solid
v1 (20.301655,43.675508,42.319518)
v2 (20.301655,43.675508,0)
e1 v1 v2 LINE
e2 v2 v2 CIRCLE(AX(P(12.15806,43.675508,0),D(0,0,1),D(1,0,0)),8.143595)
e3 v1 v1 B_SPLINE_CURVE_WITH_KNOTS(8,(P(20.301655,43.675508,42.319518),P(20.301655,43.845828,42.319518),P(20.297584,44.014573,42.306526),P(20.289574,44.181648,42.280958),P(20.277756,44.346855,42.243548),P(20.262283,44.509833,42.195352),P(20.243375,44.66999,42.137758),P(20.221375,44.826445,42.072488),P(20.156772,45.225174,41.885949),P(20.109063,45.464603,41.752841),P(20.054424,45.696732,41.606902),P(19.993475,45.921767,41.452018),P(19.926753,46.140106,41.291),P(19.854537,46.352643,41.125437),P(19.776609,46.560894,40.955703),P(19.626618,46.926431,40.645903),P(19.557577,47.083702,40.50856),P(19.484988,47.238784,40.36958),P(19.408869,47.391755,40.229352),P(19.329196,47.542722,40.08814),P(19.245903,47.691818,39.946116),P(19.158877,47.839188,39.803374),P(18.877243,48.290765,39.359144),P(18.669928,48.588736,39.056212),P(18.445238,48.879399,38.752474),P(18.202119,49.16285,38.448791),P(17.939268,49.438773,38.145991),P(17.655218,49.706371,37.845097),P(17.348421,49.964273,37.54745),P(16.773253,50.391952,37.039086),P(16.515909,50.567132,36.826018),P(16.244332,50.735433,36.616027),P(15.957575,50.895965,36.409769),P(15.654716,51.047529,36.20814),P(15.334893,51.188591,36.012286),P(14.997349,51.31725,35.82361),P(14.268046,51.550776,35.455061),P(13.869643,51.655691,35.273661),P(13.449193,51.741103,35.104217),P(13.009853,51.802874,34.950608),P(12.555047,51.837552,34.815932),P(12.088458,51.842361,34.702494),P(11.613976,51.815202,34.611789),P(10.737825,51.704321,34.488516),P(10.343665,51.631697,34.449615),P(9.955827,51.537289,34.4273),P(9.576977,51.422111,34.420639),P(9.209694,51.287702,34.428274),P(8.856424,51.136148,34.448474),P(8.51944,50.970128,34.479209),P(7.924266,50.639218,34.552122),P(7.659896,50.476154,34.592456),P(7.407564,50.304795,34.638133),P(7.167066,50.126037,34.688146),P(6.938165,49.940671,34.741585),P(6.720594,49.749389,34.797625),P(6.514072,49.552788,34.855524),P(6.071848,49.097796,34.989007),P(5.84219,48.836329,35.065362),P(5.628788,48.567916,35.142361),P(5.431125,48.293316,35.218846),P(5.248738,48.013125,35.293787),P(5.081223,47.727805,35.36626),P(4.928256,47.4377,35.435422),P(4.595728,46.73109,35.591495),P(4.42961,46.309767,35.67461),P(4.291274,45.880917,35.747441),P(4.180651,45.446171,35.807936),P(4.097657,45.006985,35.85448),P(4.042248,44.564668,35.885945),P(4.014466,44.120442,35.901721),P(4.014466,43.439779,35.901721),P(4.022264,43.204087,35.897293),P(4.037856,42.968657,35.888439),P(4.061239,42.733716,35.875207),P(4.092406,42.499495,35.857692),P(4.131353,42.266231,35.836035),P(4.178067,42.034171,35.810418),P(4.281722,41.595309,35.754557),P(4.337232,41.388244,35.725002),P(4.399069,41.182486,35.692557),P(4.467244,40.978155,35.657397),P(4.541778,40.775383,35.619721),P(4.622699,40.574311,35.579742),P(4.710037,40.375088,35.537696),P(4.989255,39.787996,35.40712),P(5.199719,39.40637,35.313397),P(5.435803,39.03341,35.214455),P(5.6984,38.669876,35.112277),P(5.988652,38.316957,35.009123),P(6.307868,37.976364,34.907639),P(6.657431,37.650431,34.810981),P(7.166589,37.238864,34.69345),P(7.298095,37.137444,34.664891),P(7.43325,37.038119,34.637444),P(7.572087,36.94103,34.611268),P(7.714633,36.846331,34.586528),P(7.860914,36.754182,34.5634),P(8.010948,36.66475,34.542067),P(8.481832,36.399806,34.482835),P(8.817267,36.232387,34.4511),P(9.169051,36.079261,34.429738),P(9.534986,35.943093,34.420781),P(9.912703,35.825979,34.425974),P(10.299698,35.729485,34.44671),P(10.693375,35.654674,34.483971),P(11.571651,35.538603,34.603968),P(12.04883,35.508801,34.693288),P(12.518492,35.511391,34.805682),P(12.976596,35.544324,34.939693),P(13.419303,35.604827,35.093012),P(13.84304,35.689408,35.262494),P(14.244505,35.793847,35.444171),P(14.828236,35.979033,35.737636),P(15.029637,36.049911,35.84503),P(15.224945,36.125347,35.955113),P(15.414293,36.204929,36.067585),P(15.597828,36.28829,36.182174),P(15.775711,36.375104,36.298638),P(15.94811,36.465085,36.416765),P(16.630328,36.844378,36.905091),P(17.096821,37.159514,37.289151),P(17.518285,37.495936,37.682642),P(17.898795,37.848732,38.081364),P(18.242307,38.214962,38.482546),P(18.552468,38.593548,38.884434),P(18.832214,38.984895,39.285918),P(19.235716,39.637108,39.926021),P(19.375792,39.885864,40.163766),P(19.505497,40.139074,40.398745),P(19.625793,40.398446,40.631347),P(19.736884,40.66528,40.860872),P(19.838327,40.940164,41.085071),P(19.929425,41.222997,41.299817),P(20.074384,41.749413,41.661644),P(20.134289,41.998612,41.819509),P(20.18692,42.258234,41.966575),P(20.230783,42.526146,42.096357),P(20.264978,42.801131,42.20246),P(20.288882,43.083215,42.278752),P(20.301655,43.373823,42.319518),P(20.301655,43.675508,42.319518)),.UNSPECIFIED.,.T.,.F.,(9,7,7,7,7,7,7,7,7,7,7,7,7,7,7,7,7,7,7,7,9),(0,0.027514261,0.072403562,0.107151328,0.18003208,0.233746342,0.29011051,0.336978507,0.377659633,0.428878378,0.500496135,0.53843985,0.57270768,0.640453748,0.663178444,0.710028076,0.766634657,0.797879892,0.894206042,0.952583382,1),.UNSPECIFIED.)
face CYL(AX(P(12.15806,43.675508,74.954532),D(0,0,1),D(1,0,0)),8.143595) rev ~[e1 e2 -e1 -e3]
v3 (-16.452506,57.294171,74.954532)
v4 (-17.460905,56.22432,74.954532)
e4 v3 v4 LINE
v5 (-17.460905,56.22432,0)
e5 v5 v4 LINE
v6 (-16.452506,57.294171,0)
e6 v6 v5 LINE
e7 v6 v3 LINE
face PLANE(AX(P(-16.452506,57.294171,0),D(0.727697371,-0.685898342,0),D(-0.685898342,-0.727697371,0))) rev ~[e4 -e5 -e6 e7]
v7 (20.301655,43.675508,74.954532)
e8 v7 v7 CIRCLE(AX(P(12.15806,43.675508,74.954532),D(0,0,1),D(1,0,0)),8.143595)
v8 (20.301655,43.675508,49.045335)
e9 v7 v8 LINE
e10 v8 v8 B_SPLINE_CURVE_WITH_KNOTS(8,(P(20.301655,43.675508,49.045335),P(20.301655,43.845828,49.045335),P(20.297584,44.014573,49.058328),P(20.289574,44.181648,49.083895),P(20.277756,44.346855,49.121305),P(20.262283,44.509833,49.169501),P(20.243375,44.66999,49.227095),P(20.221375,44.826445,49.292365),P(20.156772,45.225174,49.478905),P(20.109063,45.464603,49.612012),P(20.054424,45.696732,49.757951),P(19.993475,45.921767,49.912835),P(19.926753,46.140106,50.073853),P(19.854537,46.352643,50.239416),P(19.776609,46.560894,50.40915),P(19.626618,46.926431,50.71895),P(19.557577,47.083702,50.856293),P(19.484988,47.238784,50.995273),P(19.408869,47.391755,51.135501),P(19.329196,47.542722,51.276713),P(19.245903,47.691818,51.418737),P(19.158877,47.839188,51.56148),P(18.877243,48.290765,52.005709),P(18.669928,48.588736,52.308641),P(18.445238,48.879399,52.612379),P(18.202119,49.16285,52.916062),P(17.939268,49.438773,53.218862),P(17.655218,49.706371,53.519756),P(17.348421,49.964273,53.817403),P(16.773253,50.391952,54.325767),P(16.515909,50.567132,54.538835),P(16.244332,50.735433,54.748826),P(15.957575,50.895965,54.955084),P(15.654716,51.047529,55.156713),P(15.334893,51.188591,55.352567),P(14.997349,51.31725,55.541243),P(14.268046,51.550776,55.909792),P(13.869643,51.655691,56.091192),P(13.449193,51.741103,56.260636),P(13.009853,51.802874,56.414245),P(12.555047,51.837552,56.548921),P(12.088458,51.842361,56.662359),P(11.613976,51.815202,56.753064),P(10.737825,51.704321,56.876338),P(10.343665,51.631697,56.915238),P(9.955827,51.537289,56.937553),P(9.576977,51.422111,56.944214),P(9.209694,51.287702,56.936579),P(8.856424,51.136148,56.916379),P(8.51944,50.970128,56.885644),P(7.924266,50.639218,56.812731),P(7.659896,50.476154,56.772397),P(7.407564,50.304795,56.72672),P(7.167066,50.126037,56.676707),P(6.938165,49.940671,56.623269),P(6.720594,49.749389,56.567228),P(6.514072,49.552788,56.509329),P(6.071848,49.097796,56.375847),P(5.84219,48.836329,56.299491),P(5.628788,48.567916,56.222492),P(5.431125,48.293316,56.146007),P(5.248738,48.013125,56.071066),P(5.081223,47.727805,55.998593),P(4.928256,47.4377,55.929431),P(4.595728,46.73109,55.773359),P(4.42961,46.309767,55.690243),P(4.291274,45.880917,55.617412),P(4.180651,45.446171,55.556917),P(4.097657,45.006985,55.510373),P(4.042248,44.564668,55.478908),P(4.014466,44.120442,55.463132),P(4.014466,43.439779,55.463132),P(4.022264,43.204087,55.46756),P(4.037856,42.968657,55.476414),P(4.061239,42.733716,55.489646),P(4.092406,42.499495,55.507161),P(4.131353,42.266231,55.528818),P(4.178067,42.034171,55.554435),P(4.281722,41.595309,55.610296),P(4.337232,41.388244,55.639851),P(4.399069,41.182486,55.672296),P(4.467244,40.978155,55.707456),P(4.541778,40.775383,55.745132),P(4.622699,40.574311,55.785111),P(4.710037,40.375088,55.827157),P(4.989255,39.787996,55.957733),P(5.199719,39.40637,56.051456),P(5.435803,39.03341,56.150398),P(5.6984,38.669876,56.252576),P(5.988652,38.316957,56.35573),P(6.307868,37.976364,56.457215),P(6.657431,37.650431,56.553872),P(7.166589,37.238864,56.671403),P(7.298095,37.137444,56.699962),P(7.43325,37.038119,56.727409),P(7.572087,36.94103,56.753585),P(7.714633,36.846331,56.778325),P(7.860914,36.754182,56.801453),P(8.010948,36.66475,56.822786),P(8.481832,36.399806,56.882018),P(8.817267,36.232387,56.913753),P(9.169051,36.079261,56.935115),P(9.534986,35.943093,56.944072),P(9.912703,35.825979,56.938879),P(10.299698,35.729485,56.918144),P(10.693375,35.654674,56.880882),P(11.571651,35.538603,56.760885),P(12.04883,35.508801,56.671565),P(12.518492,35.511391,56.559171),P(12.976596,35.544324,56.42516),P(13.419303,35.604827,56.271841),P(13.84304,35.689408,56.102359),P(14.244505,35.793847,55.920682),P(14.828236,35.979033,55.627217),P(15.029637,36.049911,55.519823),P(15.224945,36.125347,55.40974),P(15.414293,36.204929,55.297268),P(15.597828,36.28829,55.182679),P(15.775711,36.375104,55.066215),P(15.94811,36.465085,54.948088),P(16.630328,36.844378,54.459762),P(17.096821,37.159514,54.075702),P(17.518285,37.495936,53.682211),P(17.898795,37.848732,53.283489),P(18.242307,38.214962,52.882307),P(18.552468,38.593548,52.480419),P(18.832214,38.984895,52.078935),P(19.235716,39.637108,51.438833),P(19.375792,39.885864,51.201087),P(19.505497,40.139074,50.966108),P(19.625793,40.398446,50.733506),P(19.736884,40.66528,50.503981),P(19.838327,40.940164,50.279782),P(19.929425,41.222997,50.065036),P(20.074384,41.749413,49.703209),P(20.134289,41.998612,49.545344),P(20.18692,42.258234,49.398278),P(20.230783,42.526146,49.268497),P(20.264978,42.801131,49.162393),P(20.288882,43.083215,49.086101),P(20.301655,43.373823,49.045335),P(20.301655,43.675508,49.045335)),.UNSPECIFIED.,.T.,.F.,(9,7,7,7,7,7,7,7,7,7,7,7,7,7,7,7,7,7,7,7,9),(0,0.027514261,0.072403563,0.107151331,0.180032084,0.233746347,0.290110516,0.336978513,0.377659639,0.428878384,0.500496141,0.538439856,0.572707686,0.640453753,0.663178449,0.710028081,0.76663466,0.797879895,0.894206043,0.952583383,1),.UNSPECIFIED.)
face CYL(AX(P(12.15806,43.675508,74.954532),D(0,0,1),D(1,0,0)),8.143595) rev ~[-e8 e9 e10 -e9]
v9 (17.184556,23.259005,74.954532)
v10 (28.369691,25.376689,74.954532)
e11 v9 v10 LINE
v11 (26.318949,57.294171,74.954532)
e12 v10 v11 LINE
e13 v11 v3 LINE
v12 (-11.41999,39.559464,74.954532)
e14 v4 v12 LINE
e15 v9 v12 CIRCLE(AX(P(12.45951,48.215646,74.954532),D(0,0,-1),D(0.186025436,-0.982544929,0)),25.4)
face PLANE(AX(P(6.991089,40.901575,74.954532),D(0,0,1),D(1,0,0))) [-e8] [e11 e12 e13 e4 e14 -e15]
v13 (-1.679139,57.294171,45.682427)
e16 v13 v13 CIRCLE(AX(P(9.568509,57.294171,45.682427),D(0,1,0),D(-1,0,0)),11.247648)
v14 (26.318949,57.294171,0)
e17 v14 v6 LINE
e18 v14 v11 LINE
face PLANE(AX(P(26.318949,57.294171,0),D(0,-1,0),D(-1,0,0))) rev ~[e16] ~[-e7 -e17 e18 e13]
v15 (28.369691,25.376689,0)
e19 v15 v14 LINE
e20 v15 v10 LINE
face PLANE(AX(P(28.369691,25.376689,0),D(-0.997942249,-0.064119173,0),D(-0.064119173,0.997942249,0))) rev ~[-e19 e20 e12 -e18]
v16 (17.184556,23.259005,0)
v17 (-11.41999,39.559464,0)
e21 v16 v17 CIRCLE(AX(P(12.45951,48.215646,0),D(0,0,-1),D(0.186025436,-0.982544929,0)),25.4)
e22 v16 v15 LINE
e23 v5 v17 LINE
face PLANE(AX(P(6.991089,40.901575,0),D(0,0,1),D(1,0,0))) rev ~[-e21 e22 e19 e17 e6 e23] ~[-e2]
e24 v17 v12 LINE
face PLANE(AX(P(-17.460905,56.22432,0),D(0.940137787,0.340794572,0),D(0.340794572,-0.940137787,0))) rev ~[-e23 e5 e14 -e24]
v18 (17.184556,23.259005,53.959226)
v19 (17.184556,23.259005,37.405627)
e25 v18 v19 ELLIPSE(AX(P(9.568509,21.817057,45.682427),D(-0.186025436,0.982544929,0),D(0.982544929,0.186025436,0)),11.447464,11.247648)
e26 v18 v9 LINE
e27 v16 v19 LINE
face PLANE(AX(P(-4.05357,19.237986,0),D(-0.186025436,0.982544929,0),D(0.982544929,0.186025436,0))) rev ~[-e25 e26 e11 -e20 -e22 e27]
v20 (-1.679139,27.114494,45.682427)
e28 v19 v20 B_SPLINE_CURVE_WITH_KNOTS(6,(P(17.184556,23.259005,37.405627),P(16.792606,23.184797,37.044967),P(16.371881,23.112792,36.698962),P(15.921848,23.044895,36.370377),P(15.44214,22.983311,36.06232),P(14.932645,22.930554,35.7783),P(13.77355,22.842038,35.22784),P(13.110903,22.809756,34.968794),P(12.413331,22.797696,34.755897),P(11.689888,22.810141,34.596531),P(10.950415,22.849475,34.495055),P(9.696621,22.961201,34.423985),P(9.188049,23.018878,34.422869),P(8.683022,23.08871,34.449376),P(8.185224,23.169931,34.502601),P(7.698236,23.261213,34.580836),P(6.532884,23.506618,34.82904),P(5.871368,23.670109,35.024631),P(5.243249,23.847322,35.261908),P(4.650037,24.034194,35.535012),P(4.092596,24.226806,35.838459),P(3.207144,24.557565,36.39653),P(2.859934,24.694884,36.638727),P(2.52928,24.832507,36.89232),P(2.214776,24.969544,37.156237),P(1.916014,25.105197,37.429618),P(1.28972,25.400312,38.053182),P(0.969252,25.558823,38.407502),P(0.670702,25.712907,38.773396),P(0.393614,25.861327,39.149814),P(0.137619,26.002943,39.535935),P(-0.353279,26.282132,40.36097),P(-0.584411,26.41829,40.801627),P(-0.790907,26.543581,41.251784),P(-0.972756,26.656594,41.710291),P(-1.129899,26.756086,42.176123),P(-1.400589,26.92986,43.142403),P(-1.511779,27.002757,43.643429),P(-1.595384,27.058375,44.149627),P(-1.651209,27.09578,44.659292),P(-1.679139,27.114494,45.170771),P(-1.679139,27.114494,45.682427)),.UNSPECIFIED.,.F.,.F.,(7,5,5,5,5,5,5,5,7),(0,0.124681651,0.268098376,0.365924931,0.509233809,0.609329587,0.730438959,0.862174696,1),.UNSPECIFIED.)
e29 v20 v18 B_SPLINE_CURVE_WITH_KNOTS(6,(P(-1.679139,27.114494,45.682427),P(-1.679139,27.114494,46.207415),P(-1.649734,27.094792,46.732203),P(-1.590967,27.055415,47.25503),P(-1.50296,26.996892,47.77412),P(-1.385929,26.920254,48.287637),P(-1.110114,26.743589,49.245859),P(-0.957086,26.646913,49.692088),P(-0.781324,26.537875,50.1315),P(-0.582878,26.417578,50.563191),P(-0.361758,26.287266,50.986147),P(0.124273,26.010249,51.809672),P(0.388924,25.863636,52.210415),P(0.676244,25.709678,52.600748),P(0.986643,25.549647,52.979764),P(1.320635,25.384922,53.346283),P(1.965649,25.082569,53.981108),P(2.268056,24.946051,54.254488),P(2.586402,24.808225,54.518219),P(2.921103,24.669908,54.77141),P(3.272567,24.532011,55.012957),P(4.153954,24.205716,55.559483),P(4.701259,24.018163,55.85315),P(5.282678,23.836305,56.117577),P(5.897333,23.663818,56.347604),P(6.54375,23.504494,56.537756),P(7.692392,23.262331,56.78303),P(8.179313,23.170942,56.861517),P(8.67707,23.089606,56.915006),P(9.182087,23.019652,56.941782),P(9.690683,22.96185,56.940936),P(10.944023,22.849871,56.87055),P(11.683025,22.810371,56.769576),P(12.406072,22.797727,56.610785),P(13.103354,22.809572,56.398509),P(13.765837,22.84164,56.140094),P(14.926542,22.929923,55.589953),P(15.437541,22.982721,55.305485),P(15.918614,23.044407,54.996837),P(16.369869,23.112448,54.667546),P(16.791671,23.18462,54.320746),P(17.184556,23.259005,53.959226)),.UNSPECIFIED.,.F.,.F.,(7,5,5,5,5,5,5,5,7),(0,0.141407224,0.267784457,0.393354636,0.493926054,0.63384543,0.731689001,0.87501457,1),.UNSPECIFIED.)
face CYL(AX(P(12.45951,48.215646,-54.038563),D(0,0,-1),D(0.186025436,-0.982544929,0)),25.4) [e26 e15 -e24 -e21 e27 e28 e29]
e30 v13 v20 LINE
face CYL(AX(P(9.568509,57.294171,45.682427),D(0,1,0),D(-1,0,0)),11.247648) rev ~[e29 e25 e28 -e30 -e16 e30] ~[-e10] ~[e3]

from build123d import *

# Parameters (mm, degrees)
F1_DEPTH    = 74.9545320868
F2_R        = 8.1435947288
F3_DEPTH    = 124.2861971259
F5_R        = 11.2476479719
F6_DEPTH    = 38.057185469
F7_T1_DEPTH = 183.0316575771


# Not quite as in the source:
# - a fillet or chamfer that OpenCascade refuses, or shapes differently, is made with other operations: its cross-section is extruded or revolved along the edge and cut away or added


with BuildPart() as f1:
    # F0 (on Top) → F1 (new body)
    with BuildSketch(Plane.XY):
        Polygon((26.3189487159, 57.2941713035), (-16.4525061846, 57.2941713035), (-17.4609050155, 56.2243200839), (-4.0535703301, 19.2379858345), (28.3696912229, 25.376688689), align=None)
    extrude(amount=F1_DEPTH)

    # F2 (on face) → F3 (cut)
    with BuildSketch(Plane.XY.offset(74.9545320868)):
        with Locations((12.1580604464, 43.6755083501)):
            Circle(F2_R)
    extrude(amount=-F3_DEPTH, mode=Mode.SUBTRACT)

    # F5 (on face) → F6 (cut, through all)
    with BuildSketch(Plane(origin=(0, 57.2941713035, 0), x_dir=(-1, 0, 0), z_dir=(0, 1, 0))):
        with Locations((-9.5685087144, 45.682426542)):
            Circle(F5_R)
    extrude(amount=-F6_DEPTH, mode=Mode.SUBTRACT)

    # F7: fillet of radius 25.4 on 1 edges, made by hand

    # F7_s2 → F7_t1 (cut)
    with BuildSketch(Plane.XY.offset(-54.0385627451)):
        with BuildLine():
            ThreePointArc((17.1845559853, 23.2590047077), (-0.1162411856, 26.147331869), (-11.4199898846, 39.559463761))
            Line((-11.4199898846, 39.559463761), (-4.0535703301, 19.2379858345))
            Line((-4.0535703301, 19.2379858345), (17.1845559853, 23.2590047077))
        make_face()
    extrude(amount=F7_T1_DEPTH, mode=Mode.SUBTRACT)


solid = f1.part
